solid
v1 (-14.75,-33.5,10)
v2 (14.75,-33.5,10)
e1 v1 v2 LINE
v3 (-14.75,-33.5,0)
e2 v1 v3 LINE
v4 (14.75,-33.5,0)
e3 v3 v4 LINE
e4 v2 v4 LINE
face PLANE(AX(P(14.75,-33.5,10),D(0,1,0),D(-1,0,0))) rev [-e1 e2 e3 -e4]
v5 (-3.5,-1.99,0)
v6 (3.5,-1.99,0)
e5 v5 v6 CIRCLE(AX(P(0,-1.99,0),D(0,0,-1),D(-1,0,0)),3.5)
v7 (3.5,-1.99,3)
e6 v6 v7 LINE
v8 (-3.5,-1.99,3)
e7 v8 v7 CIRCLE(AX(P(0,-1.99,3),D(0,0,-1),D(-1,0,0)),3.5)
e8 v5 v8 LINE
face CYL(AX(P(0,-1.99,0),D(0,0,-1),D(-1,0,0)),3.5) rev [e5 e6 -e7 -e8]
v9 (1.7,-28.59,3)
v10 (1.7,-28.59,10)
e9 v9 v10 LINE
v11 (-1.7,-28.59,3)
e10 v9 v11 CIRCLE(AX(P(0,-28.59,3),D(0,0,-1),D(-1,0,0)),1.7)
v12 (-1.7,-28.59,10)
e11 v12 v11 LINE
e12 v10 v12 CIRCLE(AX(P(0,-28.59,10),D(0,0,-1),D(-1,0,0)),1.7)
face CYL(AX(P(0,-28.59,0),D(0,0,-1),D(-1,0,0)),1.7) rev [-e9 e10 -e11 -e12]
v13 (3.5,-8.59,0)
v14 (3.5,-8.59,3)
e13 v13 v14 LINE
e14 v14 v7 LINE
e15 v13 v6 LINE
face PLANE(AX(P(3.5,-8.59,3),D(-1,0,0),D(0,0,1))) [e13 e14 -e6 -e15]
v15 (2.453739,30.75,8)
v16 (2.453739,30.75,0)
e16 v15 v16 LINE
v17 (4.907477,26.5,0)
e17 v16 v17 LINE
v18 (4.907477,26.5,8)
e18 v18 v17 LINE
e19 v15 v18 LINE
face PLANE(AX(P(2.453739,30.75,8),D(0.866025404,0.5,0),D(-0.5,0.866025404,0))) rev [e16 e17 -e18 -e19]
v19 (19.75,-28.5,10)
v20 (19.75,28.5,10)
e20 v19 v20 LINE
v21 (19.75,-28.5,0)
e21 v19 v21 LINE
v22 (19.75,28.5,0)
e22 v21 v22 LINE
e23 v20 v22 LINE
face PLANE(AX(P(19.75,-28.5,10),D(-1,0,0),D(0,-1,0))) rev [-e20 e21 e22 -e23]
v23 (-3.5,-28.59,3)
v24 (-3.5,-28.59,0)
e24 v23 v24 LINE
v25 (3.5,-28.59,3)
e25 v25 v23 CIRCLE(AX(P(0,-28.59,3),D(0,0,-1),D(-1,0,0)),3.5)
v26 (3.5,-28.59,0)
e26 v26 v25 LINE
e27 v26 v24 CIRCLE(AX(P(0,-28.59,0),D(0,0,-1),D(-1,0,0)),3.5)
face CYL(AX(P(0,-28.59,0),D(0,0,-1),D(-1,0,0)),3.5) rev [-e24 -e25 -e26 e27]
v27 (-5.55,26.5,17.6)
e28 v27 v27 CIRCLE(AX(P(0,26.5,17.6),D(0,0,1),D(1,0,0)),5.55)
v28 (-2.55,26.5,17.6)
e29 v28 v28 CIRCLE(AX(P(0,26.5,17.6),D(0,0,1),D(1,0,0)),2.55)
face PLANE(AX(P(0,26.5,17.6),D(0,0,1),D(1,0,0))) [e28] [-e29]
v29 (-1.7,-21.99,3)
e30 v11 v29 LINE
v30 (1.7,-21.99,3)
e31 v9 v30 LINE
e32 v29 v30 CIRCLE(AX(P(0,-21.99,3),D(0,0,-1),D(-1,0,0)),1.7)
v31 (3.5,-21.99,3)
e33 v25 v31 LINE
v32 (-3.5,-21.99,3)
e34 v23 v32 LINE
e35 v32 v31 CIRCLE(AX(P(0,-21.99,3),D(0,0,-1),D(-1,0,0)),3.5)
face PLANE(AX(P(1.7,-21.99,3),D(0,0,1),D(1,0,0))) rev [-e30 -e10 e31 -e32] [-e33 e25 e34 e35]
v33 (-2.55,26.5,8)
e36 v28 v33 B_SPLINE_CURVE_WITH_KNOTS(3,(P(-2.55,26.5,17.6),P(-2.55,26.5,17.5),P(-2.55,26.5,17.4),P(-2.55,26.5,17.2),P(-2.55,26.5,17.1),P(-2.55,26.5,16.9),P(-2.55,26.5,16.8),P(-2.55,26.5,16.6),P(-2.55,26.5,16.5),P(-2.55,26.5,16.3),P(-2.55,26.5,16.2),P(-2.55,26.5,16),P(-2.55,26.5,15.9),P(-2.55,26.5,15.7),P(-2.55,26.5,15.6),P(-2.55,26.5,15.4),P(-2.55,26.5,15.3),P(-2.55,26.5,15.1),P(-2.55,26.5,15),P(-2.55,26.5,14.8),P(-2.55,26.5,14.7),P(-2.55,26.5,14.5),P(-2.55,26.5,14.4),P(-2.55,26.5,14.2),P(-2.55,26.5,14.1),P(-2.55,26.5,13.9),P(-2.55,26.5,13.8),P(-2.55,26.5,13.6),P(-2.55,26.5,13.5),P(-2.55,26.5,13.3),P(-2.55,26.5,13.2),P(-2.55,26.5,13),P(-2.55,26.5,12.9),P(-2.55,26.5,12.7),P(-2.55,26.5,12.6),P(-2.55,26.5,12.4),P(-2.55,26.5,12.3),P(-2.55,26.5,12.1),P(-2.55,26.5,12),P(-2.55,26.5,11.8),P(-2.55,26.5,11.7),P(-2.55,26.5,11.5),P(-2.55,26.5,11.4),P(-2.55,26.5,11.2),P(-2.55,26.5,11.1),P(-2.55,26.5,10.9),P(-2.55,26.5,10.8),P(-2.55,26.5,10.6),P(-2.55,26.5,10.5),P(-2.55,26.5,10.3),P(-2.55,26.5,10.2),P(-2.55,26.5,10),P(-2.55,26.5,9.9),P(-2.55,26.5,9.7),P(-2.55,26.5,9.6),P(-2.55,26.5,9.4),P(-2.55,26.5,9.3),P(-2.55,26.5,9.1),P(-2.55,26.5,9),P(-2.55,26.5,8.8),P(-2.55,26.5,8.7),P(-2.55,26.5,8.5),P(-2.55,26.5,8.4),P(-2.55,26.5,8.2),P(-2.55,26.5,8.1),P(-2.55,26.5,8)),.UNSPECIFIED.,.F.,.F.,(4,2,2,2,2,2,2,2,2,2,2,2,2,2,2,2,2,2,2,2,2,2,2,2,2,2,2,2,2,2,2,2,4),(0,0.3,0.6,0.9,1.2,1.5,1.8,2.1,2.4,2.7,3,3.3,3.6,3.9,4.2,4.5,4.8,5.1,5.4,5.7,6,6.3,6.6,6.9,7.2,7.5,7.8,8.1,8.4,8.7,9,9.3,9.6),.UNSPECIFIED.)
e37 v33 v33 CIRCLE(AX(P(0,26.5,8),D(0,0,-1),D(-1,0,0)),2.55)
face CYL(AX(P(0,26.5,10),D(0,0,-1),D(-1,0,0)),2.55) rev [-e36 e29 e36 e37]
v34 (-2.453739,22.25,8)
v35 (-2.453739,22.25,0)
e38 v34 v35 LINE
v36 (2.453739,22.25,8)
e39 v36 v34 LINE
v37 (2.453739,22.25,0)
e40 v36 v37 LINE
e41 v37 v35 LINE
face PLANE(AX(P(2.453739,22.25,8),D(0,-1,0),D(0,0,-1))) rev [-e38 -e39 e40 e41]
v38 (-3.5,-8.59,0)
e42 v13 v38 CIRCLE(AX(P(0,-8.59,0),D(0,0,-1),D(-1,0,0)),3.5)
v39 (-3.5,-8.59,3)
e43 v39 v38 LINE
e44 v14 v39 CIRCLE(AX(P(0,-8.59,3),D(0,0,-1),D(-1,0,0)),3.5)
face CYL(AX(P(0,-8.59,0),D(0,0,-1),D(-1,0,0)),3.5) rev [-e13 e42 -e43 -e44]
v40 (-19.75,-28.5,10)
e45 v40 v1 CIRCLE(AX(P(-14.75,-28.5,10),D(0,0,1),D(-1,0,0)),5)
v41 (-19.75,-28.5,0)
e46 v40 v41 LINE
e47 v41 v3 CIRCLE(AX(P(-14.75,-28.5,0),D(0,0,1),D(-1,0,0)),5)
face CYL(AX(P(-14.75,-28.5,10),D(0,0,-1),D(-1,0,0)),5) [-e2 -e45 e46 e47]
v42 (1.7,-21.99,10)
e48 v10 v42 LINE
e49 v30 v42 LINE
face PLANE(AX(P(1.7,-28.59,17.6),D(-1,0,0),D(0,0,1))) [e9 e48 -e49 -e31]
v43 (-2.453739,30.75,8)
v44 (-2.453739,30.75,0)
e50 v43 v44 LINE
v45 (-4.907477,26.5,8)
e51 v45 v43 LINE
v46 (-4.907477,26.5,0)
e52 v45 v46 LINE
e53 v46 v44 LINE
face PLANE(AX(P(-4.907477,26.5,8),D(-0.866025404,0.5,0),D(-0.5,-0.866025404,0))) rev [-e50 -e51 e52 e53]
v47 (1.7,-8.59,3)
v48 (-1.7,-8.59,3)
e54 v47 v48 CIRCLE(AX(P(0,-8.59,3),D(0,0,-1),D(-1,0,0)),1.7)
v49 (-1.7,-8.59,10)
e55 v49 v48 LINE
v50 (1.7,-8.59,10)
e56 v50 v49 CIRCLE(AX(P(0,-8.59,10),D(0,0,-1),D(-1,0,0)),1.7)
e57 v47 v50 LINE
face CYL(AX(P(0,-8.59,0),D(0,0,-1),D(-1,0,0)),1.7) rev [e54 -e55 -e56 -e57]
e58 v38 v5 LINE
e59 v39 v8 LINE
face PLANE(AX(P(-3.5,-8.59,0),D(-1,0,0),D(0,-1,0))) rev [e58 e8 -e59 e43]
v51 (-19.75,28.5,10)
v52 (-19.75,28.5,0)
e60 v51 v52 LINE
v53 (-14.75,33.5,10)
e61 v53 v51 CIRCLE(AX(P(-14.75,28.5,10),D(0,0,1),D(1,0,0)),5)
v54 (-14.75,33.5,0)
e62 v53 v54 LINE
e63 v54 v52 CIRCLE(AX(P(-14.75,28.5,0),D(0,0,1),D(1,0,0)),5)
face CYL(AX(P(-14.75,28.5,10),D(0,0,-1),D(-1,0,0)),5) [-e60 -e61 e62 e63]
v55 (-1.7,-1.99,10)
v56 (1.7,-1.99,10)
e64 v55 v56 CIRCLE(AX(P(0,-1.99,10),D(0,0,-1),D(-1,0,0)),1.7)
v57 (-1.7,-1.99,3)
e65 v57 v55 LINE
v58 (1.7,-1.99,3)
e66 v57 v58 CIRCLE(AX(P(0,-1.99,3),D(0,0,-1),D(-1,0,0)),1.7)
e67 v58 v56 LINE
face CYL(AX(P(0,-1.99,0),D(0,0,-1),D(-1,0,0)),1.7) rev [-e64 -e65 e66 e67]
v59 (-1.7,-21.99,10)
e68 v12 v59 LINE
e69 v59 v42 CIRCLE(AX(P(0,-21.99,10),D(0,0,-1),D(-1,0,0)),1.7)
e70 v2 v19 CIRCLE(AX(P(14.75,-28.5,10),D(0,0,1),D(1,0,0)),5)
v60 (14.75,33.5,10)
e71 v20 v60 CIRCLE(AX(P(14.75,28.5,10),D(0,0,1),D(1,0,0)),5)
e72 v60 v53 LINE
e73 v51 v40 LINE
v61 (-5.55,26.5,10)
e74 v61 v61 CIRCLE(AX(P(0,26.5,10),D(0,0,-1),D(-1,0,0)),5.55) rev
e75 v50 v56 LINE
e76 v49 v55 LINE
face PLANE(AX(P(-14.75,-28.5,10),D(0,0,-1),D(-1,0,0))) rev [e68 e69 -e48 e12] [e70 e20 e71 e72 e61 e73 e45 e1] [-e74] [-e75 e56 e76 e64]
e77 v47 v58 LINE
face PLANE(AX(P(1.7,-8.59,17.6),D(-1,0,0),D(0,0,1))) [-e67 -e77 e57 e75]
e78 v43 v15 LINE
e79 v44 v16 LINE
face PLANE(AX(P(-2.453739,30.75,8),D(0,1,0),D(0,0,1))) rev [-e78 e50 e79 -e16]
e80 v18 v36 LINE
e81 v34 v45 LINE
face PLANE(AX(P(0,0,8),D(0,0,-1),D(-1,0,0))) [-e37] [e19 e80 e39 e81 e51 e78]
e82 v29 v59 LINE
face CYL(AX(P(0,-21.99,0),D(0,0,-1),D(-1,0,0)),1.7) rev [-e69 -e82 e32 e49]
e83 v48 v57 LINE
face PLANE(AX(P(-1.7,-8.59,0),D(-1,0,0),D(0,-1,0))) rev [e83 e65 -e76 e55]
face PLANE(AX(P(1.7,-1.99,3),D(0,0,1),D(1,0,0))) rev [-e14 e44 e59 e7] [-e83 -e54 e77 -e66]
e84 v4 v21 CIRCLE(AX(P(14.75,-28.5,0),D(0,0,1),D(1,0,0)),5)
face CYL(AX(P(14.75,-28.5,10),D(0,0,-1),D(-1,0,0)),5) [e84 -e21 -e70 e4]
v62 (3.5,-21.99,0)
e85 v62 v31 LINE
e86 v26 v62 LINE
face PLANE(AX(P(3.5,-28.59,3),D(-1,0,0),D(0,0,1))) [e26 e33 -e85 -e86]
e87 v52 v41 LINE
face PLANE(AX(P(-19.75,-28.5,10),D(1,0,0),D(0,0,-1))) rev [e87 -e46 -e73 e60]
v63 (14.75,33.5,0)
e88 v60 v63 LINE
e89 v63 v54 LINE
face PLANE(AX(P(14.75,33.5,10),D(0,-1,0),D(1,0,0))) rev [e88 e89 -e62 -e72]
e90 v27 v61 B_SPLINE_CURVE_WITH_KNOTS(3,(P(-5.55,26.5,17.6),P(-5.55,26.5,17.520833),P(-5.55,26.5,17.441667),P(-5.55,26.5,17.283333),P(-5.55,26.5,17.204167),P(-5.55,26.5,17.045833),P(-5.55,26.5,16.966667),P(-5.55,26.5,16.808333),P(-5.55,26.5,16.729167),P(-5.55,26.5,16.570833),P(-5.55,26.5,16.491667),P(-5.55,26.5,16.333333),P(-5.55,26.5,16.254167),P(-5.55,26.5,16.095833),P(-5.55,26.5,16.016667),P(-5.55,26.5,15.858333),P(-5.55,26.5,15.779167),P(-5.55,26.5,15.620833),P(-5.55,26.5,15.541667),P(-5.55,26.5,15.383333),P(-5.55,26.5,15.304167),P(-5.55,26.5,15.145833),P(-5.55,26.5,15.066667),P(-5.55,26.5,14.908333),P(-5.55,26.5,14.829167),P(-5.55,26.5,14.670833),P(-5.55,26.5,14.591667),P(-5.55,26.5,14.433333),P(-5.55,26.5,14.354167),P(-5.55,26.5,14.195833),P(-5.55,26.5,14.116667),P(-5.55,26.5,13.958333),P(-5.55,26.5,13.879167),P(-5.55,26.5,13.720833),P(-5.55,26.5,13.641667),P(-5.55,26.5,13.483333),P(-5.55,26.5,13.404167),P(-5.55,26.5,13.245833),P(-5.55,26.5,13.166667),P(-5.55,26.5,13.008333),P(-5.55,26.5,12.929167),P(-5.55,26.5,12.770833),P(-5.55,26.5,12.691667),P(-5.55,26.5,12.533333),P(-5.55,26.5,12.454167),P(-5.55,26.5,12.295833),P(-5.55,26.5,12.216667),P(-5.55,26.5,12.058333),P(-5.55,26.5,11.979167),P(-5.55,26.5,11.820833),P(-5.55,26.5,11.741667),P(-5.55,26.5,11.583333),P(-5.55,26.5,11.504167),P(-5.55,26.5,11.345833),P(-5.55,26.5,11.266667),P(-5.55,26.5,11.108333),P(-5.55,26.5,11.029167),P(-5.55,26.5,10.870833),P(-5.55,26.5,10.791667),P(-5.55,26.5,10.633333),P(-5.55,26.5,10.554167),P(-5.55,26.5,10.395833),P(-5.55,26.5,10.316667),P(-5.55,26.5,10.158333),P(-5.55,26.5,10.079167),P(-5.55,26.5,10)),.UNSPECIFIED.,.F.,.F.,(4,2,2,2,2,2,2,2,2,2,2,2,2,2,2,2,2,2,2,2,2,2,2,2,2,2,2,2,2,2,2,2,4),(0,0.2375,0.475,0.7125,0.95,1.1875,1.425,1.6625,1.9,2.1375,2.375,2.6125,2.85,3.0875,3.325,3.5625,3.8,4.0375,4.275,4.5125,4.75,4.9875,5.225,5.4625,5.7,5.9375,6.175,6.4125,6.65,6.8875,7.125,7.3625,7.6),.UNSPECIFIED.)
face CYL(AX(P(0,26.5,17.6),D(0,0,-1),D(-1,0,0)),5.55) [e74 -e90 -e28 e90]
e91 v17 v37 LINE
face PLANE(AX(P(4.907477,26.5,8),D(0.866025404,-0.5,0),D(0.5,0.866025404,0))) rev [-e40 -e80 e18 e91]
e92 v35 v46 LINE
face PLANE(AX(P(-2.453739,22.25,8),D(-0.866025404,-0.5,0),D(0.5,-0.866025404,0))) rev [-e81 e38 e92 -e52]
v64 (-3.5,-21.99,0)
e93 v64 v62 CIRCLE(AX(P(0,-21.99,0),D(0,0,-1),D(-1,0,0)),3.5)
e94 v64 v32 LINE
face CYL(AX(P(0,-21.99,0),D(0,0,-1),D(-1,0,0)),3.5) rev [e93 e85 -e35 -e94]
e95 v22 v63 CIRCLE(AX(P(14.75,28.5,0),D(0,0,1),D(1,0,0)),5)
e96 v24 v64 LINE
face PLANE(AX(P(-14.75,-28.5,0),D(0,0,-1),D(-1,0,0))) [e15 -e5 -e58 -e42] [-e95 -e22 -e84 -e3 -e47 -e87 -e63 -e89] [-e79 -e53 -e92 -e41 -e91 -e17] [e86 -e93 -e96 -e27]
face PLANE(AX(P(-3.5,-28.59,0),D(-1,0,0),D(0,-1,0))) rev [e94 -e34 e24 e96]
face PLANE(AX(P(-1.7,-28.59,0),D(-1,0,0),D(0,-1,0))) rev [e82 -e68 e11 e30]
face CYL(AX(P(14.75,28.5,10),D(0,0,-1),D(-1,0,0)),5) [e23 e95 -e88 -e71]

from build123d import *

# Parameters (mm, degrees)
SKETCH1_R                                    = 2.55
BOSS_EXTRUDE1_DEPTH                          = 10
SKETCH2_R                                    = 5.55
SKETCH2_R_2                                  = 2.55
BOSS_EXTRUDE2_DEPTH                          = 7.6
ENL_V_MAT_EXTRU_1_DEPTH                      = 8
RAINURE_DE_CHAMBRAGE_POUR_VIS_T_TE_RON_DEPTH = 10
RAINURE_DE_CHAMBRAGE_POUR_VIS_T_TE_3_DEPTH   = 3


# Read off the part's stored shape, not the designer's step: Rainure de chambrage pour vis à tête ronde bombée M32
with BuildPart() as part:
    # Sketch1 → Boss-Extrude1 (new body)
    with BuildSketch(Plane.XY):
        with BuildLine():
            Line((14.75, -33.5), (-14.75, -33.5))
            ThreePointArc((-14.75, -33.5), (-18.285533906, -32.035533906), (-19.75, -28.5))
            Line((-19.75, -28.5), (-19.75, 28.5))
            ThreePointArc((-19.75, 28.5), (-18.285533906, 32.035533906), (-14.75, 33.5))
            Line((-14.75, 33.5), (14.75, 33.5))
            ThreePointArc((14.75, 33.5), (18.285533906, 32.035533906), (19.75, 28.5))
            Line((19.75, 28.5), (19.75, -28.5))
            ThreePointArc((19.75, -28.5), (18.285533906, -32.035533906), (14.75, -33.5))
        make_face()
        with Locations((0, 26.5)):
            Circle(SKETCH1_R, mode=Mode.SUBTRACT)
    extrude(amount=BOSS_EXTRUDE1_DEPTH)

    # Sketch2 → Boss-Extrude2 (add)
    with BuildSketch(Plane.XY.offset(10)):
        with Locations(Location((0, 26.5, 0), (0, 0, 180))):
            Circle(SKETCH2_R)
        with Locations((0, 26.5)):
            Circle(SKETCH2_R_2, mode=Mode.SUBTRACT)
    extrude(amount=BOSS_EXTRUDE2_DEPTH)

    # Esquisse1 → Enlèv. mat.-Extru.1 (cut)
    with BuildSketch(Plane(origin=(0, 0, 0), x_dir=(-1, 0, 0), z_dir=(0, 0, -1))):
        Polygon((2.453738644, 22.25), (4.907477288, 26.5), (2.453738644, 30.75), (-2.453738644, 30.75), (-4.907477288, 26.5), (-2.453738644, 22.25), align=None)
    extrude(amount=-ENL_V_MAT_EXTRU_1_DEPTH, mode=Mode.SUBTRACT)

    # Rainure de chambrage pour vis _ t_te 2 → Rainure de chambrage pour vis à tête ronde bombée M32 (cut)
    with BuildSketch(Plane.XY):
        with BuildLine():
            ThreePointArc((1.7, -21.99), (0, -20.29), (-1.7, -21.99))
            Line((-1.7, -21.99), (-1.7, -28.59))
            ThreePointArc((-1.7, -28.59), (0, -30.29), (1.7, -28.59))
            Line((1.7, -28.59), (1.7, -21.99))
        make_face()
        with BuildLine():
            Line((1.7, -8.59), (1.7, -1.99))
            ThreePointArc((1.7, -1.99), (0, -0.29), (-1.7, -1.99))
            Line((-1.7, -1.99), (-1.7, -8.59))
            ThreePointArc((-1.7, -8.59), (0, -10.29), (1.7, -8.59))
        make_face()
    extrude(amount=RAINURE_DE_CHAMBRAGE_POUR_VIS_T_TE_RON_DEPTH, mode=Mode.SUBTRACT)

    # Rainure de chambrage pour vis _ t_te 3 o → Rainure de chambrage pour vis _ t_te 3 (cut)
    # profile 1 of 2: a face of its own
    with BuildSketch(Plane.XY):
        with BuildLine():
            ThreePointArc((3.5, -21.99), (0, -18.49), (-3.5, -21.99))
            Line((-3.5, -21.99), (-3.5, -28.59))
            ThreePointArc((-3.5, -28.59), (0, -32.09), (3.5, -28.59))
            Line((3.5, -28.59), (3.5, -21.99))
        make_face()
        with BuildLine():
            Line((-1.7, -28.59), (-1.7, -21.99))
            ThreePointArc((-1.7, -21.99), (0, -20.29), (1.7, -21.99))
            Line((1.7, -21.99), (1.7, -28.59))
            ThreePointArc((1.7, -28.59), (0, -30.29), (-1.7, -28.59))
        make_face(mode=Mode.SUBTRACT)
    # profile 2 of 2: a face of its own
    with BuildSketch(Plane.XY):
        with BuildLine():
            Line((3.5, -8.59), (3.5, -1.99))
            ThreePointArc((3.5, -1.99), (0, 1.51), (-3.5, -1.99))
            Line((-3.5, -1.99), (-3.5, -8.59))
            ThreePointArc((-3.5, -8.59), (0, -12.09), (3.5, -8.59))
        make_face()
        with BuildLine():
            ThreePointArc((-1.7, -1.99), (0, -0.29), (1.7, -1.99))
            Line((1.7, -1.99), (1.7, -8.59))
            ThreePointArc((1.7, -8.59), (0, -10.29), (-1.7, -8.59))
            Line((-1.7, -8.59), (-1.7, -1.99))
        make_face(mode=Mode.SUBTRACT)
    extrude(amount=RAINURE_DE_CHAMBRAGE_POUR_VIS_T_TE_3_DEPTH, mode=Mode.SUBTRACT)


solid = part.part
